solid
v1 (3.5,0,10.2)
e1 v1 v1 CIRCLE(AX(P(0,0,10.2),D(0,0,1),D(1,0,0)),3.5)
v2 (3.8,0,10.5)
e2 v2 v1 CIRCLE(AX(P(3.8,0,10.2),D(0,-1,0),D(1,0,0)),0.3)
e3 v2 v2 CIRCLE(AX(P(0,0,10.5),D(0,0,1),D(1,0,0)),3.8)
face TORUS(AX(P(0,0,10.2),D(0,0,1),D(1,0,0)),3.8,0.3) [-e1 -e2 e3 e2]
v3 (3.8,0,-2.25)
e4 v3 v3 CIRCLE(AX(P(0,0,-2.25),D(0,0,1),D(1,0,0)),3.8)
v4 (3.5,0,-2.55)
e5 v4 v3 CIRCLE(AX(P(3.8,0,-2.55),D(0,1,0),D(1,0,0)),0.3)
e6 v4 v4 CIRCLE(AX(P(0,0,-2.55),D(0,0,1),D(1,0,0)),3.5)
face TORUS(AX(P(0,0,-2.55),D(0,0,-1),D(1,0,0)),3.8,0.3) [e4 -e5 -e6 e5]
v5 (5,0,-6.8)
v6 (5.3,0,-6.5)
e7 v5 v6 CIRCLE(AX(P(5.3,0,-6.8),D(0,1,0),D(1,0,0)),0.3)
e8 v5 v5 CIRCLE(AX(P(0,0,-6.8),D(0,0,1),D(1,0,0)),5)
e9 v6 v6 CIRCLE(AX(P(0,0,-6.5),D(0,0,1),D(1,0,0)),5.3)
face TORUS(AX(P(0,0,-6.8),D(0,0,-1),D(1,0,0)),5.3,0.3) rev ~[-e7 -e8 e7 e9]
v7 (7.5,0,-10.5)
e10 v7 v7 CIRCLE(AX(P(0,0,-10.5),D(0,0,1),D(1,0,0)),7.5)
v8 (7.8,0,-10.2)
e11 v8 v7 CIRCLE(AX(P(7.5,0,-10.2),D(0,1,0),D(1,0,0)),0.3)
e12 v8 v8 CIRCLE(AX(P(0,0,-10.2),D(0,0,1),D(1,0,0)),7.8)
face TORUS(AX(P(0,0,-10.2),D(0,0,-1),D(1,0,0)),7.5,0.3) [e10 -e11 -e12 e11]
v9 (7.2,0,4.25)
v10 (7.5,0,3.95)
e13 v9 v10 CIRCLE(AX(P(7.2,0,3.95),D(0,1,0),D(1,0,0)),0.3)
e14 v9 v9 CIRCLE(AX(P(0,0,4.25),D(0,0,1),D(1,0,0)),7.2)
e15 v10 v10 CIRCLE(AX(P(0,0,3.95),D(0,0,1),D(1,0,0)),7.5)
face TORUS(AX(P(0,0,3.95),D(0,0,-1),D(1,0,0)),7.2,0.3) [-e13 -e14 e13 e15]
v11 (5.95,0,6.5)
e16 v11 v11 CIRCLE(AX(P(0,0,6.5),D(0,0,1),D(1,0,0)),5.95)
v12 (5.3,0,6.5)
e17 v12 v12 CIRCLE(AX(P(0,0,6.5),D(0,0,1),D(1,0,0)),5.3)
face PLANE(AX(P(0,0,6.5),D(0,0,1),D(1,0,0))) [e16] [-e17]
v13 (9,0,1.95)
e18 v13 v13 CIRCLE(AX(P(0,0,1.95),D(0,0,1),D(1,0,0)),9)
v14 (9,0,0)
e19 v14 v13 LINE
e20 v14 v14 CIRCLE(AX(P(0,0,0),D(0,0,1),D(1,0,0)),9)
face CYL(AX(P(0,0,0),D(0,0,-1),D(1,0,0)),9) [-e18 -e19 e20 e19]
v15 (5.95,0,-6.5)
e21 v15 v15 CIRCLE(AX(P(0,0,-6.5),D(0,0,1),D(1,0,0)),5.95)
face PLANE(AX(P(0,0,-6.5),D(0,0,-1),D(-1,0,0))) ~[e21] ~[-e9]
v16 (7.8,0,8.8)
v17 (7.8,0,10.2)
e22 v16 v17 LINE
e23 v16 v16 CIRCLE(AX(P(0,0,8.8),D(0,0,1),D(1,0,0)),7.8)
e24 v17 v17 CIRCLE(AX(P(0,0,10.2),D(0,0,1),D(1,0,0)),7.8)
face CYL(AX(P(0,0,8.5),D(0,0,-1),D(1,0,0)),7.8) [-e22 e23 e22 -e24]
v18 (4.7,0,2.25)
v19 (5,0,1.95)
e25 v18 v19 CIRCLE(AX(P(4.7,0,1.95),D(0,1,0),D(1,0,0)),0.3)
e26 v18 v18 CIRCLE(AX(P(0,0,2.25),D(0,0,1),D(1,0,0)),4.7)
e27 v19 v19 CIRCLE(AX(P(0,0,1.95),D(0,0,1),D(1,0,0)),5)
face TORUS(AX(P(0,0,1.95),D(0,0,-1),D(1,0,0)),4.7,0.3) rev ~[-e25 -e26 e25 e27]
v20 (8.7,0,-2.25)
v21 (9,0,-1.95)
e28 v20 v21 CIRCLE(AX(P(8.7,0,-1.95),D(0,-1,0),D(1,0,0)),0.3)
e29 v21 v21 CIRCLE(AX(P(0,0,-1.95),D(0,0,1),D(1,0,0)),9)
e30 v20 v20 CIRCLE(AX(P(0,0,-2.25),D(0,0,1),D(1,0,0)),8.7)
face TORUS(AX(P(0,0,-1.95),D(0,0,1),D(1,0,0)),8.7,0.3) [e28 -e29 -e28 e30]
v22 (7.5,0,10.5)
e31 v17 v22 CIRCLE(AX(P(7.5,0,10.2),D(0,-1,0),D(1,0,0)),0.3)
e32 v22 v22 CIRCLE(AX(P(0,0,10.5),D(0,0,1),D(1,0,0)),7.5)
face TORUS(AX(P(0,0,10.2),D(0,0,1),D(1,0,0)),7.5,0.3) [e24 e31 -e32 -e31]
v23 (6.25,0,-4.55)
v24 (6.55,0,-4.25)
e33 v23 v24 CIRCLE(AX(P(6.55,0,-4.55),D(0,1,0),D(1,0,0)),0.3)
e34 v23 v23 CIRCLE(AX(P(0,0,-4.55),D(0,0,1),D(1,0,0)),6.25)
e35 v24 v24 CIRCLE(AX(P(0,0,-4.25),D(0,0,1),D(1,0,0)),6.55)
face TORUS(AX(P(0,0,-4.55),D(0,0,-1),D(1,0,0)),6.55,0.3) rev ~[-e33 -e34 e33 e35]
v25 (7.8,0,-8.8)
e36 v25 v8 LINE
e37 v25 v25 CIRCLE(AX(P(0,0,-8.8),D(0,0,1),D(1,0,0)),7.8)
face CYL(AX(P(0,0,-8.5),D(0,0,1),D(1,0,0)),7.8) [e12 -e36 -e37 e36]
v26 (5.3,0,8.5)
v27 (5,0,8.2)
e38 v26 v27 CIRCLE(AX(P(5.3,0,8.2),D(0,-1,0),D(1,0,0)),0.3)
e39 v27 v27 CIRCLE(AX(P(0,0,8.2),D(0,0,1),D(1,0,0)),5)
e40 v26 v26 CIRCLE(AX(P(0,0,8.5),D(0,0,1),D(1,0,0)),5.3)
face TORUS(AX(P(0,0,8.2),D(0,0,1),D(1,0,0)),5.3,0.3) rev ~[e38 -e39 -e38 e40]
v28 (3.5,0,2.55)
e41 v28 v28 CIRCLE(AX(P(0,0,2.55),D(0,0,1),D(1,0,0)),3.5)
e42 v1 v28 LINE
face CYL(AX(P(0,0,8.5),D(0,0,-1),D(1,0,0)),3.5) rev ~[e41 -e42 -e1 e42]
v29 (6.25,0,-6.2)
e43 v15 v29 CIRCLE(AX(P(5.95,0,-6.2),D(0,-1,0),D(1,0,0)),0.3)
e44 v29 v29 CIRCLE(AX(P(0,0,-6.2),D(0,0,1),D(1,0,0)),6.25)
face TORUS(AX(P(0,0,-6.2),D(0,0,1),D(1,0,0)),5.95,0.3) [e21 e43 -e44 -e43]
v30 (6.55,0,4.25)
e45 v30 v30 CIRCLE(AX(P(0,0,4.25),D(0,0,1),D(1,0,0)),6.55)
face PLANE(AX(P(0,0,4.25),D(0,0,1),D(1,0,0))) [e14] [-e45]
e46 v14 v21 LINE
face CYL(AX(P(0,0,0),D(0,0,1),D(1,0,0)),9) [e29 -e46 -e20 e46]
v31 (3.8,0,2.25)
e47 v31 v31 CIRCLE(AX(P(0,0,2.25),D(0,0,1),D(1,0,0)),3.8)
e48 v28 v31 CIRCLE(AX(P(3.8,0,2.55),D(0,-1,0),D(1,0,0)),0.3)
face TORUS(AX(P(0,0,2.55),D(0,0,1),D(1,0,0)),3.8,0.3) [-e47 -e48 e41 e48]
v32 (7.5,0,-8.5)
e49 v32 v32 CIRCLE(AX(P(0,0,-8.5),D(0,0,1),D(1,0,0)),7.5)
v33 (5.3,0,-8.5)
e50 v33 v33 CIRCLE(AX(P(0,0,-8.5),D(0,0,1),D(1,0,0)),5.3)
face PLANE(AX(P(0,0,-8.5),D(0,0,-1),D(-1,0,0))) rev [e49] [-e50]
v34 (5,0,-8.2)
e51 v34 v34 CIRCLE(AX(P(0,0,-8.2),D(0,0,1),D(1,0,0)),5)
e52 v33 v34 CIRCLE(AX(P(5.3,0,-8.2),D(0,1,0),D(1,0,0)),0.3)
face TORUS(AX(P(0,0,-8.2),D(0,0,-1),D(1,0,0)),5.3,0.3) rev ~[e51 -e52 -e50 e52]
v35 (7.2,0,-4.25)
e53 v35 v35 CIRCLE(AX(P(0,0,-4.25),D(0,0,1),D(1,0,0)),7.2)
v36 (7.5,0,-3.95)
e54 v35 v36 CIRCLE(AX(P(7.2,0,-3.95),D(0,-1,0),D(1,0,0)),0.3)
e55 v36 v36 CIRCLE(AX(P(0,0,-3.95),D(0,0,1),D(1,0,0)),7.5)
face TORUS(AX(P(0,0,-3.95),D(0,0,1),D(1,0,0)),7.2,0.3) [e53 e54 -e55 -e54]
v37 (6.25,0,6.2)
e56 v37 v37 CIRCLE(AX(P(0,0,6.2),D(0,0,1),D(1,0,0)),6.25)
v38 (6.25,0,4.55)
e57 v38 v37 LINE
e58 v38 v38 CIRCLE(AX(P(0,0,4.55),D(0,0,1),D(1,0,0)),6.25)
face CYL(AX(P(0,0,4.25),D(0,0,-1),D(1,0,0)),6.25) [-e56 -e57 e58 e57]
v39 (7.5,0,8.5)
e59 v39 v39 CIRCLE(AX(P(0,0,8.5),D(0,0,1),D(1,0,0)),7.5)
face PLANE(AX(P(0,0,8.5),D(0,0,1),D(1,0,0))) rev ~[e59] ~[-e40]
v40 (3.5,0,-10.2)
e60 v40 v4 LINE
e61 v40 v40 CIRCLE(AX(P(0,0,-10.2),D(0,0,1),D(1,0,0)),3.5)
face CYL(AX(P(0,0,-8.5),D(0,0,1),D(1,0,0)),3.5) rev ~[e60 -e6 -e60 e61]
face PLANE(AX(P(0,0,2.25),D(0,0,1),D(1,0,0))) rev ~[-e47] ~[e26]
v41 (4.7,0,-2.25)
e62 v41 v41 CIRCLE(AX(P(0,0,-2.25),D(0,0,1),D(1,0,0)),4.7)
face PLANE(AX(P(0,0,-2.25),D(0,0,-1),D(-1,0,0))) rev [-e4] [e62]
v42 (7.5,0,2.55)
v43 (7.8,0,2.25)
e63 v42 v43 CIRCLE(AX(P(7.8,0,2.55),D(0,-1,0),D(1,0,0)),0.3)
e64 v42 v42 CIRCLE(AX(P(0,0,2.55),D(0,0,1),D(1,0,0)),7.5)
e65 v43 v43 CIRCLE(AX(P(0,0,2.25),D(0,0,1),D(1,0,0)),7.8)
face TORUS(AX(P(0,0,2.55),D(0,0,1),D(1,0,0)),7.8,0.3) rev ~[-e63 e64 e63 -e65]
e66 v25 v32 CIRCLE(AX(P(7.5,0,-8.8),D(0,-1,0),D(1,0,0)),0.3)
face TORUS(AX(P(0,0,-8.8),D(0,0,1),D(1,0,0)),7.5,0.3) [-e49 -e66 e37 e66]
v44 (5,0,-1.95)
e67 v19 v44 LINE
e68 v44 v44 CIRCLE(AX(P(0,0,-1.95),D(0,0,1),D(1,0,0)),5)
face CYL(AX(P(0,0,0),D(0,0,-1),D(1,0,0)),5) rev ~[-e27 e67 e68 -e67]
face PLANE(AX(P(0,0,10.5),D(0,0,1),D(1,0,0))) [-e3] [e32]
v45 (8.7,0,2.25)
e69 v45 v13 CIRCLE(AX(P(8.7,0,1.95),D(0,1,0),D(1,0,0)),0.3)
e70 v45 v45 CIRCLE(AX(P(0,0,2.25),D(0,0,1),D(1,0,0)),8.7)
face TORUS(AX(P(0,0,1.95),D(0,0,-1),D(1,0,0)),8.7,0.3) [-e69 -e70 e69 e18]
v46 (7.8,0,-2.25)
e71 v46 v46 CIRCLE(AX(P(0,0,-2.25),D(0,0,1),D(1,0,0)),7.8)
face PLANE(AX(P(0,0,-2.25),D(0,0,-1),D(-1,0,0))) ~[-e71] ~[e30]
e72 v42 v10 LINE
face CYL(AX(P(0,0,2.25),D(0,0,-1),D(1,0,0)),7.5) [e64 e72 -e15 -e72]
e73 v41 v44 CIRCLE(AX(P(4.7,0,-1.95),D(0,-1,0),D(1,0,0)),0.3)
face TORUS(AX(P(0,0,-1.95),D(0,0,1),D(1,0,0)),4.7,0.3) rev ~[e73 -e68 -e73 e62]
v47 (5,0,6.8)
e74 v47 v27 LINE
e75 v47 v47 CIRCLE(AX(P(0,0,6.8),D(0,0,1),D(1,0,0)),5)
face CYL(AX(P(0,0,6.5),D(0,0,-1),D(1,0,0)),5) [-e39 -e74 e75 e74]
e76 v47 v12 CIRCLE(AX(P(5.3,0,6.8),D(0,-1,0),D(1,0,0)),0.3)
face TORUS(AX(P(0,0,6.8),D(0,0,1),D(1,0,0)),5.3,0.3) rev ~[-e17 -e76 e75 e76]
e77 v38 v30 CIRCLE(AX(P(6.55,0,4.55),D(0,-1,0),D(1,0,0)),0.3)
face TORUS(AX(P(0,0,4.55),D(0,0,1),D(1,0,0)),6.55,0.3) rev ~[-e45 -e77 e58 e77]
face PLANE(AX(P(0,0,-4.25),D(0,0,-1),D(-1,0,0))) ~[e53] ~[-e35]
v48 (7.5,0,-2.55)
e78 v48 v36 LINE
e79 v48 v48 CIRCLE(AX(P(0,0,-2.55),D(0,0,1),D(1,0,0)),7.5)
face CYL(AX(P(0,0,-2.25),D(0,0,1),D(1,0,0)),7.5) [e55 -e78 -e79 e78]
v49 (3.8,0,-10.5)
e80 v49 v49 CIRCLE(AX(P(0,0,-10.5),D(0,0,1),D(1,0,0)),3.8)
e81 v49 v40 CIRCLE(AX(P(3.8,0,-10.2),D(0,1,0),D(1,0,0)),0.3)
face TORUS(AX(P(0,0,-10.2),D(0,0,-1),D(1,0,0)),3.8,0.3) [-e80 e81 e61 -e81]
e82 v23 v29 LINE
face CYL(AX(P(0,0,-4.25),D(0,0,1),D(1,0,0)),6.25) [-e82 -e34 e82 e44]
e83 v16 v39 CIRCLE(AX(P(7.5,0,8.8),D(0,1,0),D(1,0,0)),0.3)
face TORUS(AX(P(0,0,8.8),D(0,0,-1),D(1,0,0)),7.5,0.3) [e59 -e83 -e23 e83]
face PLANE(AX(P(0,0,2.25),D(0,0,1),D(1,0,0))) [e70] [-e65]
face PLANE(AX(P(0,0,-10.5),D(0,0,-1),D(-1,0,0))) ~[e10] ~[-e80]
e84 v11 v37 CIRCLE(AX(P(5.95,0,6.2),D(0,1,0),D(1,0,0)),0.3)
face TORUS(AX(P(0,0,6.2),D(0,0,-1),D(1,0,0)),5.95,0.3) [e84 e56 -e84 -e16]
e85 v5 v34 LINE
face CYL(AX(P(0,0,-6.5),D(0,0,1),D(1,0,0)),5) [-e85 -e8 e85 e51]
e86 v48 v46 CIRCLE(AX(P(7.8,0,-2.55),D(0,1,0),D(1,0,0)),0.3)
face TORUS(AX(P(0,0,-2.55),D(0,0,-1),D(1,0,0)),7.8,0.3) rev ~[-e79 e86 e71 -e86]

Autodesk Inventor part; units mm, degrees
ref_plane "YZ Plane" through (0, 0, 0) normal (1, 0, 0) x (0, 1, 0)
ref_plane "XZ Plane" through (0, 0, 0) normal (0, 1, 0) x (-1, 0, 0)
ref_plane "XY Plane" through (0, 0, 0) normal (0, 0, 1) x (1, 0, 0)
sketch "Sketch1" plane through (0, 0, 0) normal (0, 0, 1) x (1, 0, 0)
  circle A0 centre (0, 0) radius 9
  circle A1 centre (0, 0) radius 5
  dimension "d0" = 18
  dimension "d3" = 10
extrude "Extrusion1" add sketch "Sketch1" along normal blind 2.25
sketch "Sketch2" plane through (0, 0, 2.25) normal (0, 0, 1) x (1, 0, 0)
  circle A0 centre (0, 0) radius 7.5
  circle A1 centre (0, 0) radius 3.5
  dimension "d4" = 15
  dimension "d5" = 7
extrude "Extrusion2" add sketch "Sketch2" along normal blind 2
sketch "Sketch3" plane through (0, 0, 4.25) normal (0, 0, 1) x (1, 0, 0)
  circle A0 centre (0, 0) radius 3.5 projected
  circle A1 centre (0, 0) radius 6.25
  dimension "d8" = 12.5
extrude "Extrusion3" add sketch "Sketch3" along normal blind 2.25
sketch "Sketch4" plane through (0, 0, 6.5) normal (0, 0, 1) x (1, 0, 0)
  circle A0 centre (0, 0) radius 3.5 projected
  circle A1 centre (0, 0) radius 5
  dimension "d11" = 10
extrude "Extrusion4" add sketch "Sketch4" along normal blind 2
sketch "Sketch5" plane through (0, 0, 8.5) normal (0, 0, 1) x (1, 0, 0)
  circle A0 centre (0, 0) radius 7.8
  circle A1 centre (0, 0) radius 3.5 projected
  dimension "d14" = 15.6
extrude "Extrusion5" add sketch "Sketch5" along normal blind 2
fillet "Fillet1" radius 0.3 12 edges at (-7.5, 0, 2.25) (-7.5, 0, 4.25) (-6.25, 0, 4.25) (-6.25, 0, 6.5) (-5, 0, 6.5) (-5, 0, 8.5) (-7.8, 0, 8.5) (-7.8, 0, 10.5) (-9, 0, 2.25) (-3.5, 0, 2.25) (-5, 0, 2.25) (-3.5, 0, 10.5)
mirror "Mirror2" about plane through (0, 0, 0) normal (0, 0, 1)
properties part number "lastik" material "Rubber, Silicone"
